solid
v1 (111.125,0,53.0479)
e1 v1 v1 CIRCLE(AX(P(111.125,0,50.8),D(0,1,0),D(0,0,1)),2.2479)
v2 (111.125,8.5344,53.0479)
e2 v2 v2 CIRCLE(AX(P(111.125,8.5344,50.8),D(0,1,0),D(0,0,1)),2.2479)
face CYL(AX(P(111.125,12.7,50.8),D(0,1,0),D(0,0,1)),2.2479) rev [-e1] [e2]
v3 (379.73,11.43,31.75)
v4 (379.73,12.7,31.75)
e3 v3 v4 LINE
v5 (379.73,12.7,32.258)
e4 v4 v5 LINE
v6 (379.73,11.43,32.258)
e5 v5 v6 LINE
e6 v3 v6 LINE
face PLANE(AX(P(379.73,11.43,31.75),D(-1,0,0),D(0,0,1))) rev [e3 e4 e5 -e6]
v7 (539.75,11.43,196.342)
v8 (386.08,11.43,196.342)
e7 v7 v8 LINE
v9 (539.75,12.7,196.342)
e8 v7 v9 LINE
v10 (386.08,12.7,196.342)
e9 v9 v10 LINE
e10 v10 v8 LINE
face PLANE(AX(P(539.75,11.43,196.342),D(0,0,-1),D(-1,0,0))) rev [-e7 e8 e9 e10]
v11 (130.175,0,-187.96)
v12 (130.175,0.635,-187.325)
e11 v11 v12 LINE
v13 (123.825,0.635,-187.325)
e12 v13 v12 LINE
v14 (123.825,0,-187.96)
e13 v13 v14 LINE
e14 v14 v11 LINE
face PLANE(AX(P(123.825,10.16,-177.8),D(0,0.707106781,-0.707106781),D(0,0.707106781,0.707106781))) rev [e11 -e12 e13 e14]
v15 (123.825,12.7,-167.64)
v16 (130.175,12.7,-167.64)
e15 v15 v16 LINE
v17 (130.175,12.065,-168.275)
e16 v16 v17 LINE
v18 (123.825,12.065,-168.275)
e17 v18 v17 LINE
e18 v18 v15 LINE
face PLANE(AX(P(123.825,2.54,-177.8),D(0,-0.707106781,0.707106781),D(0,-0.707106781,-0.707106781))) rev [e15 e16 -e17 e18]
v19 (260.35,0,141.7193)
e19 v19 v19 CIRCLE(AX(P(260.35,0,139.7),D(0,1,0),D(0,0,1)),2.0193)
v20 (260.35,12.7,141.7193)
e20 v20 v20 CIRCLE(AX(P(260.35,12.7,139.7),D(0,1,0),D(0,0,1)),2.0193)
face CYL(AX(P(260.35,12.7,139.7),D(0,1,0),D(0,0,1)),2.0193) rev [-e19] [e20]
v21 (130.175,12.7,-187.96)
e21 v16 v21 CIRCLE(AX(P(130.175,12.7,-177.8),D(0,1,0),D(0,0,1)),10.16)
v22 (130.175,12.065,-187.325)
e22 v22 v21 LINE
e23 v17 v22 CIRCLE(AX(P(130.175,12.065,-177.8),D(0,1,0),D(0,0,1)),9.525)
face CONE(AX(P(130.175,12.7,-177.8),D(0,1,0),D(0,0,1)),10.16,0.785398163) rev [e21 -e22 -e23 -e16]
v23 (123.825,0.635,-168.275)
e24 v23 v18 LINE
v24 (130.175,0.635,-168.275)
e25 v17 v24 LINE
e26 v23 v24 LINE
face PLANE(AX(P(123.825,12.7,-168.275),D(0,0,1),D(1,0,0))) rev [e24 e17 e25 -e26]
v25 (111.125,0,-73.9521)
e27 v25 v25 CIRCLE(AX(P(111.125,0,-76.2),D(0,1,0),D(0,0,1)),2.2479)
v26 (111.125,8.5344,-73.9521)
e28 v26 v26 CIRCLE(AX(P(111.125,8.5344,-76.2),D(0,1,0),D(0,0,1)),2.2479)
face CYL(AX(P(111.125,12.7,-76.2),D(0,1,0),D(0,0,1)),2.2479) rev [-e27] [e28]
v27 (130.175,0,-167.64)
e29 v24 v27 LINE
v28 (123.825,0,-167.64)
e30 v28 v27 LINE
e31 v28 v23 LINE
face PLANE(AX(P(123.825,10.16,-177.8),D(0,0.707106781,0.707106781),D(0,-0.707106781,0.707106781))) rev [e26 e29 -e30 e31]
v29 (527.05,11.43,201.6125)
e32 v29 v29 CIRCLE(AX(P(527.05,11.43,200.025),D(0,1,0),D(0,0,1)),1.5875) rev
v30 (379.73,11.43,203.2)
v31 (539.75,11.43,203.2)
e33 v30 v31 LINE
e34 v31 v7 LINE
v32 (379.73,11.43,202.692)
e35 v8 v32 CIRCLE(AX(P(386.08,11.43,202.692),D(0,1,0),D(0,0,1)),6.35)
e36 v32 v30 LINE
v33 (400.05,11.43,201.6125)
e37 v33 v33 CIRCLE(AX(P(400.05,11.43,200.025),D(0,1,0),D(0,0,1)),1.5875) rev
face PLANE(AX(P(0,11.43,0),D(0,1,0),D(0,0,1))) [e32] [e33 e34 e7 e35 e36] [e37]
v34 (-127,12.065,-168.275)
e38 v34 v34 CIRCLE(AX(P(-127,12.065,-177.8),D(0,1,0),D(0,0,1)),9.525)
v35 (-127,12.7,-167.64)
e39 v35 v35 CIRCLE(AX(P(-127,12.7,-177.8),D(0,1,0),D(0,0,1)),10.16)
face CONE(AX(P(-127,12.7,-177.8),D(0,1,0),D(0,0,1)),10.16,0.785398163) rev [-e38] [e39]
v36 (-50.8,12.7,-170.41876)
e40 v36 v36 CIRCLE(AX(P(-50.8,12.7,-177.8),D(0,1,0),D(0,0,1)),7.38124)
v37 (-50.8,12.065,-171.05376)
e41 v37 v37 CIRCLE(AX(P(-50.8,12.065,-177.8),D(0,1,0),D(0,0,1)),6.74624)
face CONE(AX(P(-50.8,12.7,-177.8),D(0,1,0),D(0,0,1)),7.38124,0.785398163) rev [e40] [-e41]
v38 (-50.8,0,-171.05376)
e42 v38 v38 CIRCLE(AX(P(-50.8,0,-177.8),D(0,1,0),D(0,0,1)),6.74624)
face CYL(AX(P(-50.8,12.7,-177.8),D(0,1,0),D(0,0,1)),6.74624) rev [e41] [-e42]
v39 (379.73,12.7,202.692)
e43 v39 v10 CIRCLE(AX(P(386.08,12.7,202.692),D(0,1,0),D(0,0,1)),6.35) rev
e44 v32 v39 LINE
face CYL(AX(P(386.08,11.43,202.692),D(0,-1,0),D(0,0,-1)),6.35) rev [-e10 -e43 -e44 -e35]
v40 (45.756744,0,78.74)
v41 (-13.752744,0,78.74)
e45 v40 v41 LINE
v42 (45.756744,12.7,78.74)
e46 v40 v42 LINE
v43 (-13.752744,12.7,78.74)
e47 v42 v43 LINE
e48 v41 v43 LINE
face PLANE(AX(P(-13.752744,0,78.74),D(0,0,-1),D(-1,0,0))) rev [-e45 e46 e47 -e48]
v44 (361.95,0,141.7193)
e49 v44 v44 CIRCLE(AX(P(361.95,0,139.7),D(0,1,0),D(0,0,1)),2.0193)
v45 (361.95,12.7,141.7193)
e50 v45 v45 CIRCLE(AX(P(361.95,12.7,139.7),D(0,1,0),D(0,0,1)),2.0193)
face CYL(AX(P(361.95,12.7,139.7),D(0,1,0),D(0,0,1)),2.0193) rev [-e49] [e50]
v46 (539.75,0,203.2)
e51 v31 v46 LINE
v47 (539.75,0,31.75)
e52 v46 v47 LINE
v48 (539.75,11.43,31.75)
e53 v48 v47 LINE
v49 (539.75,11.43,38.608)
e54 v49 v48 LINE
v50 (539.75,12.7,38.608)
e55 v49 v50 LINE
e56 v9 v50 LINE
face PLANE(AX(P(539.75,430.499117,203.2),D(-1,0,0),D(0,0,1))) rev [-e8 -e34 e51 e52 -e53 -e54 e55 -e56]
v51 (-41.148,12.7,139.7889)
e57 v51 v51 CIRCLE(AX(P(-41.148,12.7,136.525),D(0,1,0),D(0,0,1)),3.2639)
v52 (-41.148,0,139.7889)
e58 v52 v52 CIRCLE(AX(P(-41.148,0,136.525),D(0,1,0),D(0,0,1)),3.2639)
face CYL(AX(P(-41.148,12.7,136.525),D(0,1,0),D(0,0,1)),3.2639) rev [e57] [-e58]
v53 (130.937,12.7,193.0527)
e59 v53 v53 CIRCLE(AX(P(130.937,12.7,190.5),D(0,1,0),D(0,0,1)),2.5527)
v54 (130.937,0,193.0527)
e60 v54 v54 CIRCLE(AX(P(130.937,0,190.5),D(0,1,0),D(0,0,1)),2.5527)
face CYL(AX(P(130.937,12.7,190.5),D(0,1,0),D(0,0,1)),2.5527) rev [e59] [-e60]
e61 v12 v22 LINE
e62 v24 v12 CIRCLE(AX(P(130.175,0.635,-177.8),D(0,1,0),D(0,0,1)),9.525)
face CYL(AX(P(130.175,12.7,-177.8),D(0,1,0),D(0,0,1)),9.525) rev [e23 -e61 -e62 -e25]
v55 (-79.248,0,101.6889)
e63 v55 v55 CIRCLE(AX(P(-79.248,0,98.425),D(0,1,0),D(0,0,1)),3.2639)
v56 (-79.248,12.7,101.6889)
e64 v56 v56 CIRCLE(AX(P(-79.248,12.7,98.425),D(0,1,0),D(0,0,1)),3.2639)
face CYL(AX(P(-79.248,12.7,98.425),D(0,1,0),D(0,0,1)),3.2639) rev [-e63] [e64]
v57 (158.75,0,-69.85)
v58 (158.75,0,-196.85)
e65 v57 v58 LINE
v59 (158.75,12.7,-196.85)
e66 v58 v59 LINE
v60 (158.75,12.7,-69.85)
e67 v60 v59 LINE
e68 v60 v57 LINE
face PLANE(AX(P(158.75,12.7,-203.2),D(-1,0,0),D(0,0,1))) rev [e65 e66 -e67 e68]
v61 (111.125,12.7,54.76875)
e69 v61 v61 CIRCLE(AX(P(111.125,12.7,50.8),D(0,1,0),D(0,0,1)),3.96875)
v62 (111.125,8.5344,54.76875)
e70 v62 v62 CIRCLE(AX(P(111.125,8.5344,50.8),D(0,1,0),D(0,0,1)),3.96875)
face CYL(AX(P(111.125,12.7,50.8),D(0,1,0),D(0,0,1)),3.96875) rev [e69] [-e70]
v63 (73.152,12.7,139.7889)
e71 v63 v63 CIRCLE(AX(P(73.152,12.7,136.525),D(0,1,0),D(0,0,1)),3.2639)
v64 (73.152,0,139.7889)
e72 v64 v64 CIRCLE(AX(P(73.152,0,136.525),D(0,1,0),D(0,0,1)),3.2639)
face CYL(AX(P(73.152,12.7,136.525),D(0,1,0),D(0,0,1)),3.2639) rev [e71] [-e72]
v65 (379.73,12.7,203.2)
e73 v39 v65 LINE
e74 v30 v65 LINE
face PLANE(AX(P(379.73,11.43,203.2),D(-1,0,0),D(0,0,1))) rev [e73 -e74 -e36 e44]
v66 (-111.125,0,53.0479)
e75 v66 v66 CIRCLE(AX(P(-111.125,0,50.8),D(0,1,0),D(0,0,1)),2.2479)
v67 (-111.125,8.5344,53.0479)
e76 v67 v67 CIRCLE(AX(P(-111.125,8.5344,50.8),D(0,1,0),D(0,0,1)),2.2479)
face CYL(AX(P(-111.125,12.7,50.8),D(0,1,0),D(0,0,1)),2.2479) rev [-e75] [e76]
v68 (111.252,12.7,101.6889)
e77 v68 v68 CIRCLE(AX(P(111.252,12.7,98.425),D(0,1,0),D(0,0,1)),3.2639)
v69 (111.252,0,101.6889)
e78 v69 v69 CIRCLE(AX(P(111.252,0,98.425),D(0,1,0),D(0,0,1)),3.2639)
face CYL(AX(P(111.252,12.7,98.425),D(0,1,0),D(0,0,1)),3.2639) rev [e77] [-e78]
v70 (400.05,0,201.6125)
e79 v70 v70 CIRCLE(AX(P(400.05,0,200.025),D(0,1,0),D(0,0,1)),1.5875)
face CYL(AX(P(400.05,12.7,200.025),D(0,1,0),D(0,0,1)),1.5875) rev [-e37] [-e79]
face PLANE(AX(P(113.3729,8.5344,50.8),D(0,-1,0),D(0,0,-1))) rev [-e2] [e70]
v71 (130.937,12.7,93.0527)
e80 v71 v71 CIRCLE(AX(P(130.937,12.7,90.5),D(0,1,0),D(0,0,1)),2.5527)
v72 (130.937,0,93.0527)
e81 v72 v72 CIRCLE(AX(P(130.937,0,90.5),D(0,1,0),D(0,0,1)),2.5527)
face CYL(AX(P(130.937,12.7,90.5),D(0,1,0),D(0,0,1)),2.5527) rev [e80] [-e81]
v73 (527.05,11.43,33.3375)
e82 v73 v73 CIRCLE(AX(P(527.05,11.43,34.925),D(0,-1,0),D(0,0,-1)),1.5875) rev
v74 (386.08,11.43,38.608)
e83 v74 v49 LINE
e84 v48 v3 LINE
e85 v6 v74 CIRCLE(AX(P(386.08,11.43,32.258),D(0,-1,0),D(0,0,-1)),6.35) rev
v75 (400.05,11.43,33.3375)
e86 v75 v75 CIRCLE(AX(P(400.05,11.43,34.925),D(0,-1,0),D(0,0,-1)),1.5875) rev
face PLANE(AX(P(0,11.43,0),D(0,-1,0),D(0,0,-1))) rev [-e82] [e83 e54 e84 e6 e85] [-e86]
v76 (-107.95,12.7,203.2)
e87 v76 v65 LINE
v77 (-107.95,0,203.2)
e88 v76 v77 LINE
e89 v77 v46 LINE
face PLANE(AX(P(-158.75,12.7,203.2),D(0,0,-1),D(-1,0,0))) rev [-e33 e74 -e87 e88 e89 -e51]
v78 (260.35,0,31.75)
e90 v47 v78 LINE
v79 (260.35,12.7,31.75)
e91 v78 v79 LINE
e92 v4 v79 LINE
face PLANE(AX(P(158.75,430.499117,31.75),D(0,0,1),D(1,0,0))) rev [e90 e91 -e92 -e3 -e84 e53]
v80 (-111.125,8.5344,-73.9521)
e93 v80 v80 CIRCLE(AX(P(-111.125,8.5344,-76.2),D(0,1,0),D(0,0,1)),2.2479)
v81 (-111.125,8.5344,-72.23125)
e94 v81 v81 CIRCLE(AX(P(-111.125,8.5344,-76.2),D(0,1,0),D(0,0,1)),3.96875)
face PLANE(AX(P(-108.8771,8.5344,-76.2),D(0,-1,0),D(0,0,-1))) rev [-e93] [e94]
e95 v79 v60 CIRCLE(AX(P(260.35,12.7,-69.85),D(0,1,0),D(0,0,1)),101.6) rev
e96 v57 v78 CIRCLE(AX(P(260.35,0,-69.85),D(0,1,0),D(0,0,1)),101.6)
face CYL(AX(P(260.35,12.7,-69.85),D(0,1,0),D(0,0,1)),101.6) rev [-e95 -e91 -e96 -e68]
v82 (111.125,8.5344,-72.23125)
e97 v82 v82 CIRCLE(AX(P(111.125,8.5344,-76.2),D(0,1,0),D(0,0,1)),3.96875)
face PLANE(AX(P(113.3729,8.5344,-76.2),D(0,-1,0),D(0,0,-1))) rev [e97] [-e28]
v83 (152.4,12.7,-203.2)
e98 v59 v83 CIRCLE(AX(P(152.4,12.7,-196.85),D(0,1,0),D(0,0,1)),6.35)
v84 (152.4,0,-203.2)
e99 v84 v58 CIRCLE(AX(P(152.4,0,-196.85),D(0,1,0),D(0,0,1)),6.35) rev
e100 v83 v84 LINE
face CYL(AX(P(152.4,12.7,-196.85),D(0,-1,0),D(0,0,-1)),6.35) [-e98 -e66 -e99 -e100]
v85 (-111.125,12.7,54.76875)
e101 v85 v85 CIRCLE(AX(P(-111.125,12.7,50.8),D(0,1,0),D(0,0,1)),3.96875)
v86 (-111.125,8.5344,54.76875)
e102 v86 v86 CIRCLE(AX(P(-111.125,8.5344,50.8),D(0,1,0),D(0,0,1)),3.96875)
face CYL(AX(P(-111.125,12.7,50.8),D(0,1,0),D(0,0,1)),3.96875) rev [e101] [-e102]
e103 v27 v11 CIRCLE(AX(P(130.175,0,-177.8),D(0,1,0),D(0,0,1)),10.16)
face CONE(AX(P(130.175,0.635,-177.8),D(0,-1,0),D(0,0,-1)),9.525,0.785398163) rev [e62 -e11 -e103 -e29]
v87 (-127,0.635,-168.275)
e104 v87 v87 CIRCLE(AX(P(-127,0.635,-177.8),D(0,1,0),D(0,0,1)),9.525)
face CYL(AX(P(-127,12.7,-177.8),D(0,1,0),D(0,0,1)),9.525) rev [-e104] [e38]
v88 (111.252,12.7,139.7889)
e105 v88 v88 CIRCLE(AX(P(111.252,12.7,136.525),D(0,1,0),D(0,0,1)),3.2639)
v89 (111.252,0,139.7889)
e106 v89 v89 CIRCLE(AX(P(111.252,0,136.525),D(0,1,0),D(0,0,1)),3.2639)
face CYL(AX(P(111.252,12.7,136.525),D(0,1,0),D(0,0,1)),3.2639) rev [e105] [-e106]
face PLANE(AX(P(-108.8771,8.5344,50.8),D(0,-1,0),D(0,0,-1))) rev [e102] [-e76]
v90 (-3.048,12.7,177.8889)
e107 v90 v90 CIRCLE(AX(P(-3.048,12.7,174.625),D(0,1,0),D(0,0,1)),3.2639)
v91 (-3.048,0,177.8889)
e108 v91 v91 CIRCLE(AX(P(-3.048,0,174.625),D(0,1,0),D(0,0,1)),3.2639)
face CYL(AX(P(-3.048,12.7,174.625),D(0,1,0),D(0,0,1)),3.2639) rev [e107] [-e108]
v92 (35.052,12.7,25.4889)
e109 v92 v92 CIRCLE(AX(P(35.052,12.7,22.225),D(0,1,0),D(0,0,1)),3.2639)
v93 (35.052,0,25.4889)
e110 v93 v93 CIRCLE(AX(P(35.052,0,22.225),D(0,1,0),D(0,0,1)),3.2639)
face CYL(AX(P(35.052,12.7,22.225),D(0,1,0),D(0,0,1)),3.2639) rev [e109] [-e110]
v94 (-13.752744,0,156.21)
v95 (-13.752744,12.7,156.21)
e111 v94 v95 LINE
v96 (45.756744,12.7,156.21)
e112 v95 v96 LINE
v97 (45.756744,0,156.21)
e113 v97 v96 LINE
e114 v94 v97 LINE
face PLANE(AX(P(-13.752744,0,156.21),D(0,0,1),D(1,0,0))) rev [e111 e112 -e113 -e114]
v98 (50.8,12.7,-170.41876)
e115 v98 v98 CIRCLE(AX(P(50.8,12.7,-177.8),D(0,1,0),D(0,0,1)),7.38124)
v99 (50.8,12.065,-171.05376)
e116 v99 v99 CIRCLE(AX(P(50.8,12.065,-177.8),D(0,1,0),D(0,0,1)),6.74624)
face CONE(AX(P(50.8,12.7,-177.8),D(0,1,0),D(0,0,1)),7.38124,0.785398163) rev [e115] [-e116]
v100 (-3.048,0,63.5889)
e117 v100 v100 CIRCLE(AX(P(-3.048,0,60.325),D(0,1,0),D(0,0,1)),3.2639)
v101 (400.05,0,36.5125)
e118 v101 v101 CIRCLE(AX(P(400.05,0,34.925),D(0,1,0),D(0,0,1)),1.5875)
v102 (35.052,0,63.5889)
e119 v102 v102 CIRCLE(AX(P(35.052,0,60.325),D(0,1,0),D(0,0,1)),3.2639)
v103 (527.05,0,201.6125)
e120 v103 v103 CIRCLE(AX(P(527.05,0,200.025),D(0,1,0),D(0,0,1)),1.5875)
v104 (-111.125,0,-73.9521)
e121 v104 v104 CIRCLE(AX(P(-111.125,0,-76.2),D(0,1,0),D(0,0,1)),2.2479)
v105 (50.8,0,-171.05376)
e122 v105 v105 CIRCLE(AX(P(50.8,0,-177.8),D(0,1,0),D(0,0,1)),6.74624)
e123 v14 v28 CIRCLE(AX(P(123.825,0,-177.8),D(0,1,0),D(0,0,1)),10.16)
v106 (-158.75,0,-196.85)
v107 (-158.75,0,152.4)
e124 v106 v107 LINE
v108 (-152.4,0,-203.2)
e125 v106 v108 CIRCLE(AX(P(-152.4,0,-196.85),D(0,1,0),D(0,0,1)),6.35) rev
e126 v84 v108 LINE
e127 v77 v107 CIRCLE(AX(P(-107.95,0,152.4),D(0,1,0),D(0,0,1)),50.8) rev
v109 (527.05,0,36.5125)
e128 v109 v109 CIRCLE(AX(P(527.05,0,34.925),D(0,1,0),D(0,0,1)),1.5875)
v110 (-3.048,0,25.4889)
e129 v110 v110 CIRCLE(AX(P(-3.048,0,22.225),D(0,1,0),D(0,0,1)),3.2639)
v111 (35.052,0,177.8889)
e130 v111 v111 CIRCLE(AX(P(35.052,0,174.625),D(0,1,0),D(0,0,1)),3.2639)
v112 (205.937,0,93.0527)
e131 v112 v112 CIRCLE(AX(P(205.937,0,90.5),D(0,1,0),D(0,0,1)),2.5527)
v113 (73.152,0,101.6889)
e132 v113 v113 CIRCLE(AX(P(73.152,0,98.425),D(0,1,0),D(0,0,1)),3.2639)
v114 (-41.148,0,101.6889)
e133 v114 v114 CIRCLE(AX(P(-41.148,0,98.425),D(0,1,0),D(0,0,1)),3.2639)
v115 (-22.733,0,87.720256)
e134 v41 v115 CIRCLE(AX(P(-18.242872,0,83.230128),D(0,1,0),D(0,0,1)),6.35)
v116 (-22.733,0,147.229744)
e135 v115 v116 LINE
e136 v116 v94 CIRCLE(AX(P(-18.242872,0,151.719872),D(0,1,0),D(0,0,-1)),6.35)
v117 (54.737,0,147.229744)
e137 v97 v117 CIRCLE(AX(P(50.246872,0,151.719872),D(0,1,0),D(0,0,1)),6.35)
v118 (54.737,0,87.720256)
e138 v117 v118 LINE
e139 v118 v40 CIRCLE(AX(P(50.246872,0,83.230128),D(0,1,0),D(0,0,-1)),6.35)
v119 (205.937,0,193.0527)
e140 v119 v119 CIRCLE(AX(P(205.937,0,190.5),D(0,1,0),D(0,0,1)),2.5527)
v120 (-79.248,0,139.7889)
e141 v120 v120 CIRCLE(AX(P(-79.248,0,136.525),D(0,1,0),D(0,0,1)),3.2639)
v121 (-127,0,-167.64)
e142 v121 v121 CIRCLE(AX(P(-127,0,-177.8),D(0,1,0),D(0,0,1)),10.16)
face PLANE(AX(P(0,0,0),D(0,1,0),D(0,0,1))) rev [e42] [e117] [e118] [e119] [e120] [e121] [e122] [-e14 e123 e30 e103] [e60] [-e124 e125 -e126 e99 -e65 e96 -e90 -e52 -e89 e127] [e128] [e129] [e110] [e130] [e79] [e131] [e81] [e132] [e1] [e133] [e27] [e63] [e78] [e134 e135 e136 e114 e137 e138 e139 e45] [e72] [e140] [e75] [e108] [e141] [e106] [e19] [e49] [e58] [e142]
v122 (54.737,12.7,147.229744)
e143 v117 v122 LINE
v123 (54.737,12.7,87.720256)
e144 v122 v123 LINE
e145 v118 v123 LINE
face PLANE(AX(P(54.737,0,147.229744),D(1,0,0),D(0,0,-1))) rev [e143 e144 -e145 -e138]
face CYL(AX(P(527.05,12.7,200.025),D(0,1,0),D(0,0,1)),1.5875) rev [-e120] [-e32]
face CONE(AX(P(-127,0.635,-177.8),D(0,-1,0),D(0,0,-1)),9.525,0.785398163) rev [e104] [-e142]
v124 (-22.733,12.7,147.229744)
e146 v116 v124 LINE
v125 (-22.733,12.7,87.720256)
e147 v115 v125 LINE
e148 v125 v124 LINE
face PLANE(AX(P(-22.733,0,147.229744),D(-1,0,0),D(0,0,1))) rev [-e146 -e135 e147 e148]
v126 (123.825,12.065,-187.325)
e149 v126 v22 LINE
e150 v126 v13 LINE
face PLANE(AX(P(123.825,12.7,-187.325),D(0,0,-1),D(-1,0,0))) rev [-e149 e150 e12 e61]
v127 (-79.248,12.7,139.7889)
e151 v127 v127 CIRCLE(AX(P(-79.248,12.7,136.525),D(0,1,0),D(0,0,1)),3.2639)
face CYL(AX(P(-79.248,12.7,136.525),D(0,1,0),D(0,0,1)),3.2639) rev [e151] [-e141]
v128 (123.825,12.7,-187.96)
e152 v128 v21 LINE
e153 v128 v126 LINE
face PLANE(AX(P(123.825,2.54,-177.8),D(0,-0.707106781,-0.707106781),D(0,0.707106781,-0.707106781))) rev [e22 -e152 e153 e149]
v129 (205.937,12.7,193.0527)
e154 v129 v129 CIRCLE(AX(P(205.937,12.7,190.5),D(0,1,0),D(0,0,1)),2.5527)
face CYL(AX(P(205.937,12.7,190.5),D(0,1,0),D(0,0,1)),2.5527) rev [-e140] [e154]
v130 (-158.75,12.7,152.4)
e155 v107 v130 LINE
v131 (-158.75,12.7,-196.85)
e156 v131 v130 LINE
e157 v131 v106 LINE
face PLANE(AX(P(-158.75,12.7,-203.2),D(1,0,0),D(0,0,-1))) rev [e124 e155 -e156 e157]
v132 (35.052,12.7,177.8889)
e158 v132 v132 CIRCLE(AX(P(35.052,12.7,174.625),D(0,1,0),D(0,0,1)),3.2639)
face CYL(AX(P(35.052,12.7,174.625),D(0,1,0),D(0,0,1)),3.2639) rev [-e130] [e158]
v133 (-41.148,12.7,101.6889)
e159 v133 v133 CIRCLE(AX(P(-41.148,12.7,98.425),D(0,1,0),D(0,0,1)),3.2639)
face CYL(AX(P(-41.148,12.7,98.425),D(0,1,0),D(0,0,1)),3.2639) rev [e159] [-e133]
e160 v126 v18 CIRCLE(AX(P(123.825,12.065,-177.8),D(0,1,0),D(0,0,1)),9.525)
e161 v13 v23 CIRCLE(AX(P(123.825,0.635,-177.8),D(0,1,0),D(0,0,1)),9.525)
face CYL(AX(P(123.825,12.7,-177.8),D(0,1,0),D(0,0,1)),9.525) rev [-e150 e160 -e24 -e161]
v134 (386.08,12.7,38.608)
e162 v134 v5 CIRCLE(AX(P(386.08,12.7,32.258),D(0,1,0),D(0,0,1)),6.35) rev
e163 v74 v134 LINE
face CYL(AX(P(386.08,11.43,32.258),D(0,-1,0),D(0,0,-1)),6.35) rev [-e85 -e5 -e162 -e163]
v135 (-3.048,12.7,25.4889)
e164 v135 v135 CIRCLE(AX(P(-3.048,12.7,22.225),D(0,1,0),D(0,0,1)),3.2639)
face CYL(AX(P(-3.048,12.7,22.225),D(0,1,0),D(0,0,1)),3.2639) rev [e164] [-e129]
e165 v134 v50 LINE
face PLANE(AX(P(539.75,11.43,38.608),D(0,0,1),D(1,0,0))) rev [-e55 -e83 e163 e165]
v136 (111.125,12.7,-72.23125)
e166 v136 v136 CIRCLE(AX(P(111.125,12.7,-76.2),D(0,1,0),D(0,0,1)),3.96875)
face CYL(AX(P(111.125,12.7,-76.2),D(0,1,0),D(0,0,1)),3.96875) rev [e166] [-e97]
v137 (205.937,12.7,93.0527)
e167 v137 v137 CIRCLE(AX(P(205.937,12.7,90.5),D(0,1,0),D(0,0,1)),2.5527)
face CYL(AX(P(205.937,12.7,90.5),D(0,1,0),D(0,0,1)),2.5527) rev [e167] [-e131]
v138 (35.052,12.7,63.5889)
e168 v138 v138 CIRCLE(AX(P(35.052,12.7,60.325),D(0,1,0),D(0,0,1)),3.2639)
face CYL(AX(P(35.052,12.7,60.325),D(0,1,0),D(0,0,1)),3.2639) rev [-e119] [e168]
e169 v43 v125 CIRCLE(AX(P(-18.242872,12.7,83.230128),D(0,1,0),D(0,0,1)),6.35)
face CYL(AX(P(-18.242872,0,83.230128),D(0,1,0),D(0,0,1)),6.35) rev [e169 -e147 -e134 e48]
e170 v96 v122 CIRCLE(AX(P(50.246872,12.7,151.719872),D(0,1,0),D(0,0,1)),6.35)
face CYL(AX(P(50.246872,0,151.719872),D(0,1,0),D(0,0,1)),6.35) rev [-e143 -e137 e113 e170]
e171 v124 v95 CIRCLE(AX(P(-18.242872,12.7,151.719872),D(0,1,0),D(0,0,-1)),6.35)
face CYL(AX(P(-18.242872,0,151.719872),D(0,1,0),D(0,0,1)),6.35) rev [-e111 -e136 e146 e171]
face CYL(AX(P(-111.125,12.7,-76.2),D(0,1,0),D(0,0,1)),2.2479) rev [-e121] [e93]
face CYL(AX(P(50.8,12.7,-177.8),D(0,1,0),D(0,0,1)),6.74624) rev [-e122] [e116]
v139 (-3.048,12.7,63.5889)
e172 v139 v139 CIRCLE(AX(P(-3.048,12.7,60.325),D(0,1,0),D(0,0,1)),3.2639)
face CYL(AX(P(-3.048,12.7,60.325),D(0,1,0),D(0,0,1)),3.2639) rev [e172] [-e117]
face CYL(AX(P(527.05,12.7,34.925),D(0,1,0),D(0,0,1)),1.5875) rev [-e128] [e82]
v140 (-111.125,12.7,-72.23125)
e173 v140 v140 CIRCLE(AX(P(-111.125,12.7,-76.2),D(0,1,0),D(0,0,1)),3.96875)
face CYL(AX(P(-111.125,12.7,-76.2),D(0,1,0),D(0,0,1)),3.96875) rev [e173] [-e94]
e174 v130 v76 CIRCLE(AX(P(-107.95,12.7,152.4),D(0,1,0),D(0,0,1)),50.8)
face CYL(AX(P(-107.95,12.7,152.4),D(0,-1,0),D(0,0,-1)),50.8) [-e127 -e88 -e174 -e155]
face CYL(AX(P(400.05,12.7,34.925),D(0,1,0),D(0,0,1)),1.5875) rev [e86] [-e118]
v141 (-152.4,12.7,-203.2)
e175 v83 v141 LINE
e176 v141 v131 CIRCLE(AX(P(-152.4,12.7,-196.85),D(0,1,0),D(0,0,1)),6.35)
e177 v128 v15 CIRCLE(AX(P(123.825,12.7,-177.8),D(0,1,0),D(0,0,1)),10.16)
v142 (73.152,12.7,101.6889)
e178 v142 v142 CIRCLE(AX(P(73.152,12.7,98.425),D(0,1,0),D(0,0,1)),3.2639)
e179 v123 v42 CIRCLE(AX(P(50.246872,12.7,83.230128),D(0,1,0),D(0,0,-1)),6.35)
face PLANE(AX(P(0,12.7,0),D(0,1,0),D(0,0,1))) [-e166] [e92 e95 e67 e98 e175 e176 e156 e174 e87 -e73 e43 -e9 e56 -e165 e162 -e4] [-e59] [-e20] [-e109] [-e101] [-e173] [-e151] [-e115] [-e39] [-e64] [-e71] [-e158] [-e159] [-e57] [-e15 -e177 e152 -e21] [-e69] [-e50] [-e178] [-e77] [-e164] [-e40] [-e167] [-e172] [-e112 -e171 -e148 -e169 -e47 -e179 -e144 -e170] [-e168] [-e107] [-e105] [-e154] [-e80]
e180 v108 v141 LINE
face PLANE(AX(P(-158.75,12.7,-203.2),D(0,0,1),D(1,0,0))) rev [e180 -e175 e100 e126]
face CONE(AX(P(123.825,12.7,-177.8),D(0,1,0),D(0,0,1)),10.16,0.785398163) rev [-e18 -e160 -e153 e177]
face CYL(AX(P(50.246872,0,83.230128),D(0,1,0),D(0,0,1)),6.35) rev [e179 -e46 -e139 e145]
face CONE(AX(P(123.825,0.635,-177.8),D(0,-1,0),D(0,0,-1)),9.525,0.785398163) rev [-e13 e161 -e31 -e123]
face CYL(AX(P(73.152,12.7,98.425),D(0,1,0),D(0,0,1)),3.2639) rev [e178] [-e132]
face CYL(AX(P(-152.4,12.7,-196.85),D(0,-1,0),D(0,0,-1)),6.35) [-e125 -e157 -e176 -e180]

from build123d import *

# Parameters (mm, degrees)
SKETCH1_W                                      = 317.5
SKETCH1_H                                      = 406.4
BOSS_EXTRUDE1_DEPTH                            = 12.7
FILLET1_R                                      = 6.35
F_3_4_START                                    = 123.825
F_3_4_0_7500_DOWEL_SLOT1_3_DEPTH               = 6.35
F_1_2_CLEARANCE_HOLE1_D                        = 13.49248
F_1_2_CLEARANCE_HOLE1_CSINK_D                  = 14.76248
F_1_2_CLEARANCE_HOLE1_CSINK_ANGLE              = 90
SKETCH8_W                                      = 381
SKETCH8_H                                      = 171.45
BOSS_EXTRUDE2_DEPTH                            = 12.7
FILLET2_R                                      = 50.8
FILLET3_R                                      = 101.6
F_1_8_0_1250_DOWEL_HOLE1_D                     = 3.175
F_1_8_0_1250_DOWEL_HOLE1_CSINK_D               = 4.445
F_1_8_0_1250_DOWEL_HOLE1_CSINK_ANGLE           = 90
CUT_EXTRUDE1_DEPTH                             = 577.872249723
F_5_16_18_TAPPED_HOLE1_D                       = 6.5278
F_5_16_18_TAPPED_HOLE1_DEPTH                   = 20.1168
F_5_16_18_TAPPED_HOLE1_TIP                     = 1.961148974
CBORE_FOR_8_SOCKET_HEAD_CAP_SCREW1_D           = 4.4958
CBORE_FOR_8_SOCKET_HEAD_CAP_SCREW1_CBORE_D     = 7.9375
CBORE_FOR_8_SOCKET_HEAD_CAP_SCREW1_CBORE_DEPTH = 4.1656
SKETCH23_W                                     = 160.02
SKETCH23_H                                     = 6.858
CUT_EXTRUDE3_DEPTH                             = 1.27
FILLET4_R                                      = 6.35
F_10_32_TAPPED_HOLE1_D                         = 4.0386
F_1_4_20_TAPPED_HOLE1_D                        = 5.1054


with BuildPart() as part:
    # Sketch1 → Boss-Extrude1 (new body)
    with BuildSketch(Plane(origin=(0, 0, 0), x_dir=(1, 0, 0), z_dir=(0, 1, 0))):
        Rectangle(SKETCH1_W, SKETCH1_H)
    extrude(amount=BOSS_EXTRUDE1_DEPTH)

    # Fillet1
    fillet1_edges = [part.edges().sort_by_distance(p)[0] for p in [
        (-158.75, 6.35, -203.2),
        (158.75, 6.35, -203.2),
    ]]
    fillet(fillet1_edges, radius=FILLET1_R)

    # Sketch3 → 3/4 (0.7500) Dowel Hole1 (revolve, cut)
    with BuildSketch(Plane(origin=(-127, 12.7, -177.8), x_dir=(0, 0, 1), z_dir=(1, 0, 0))):
        Polygon((0, 0), (0, 12.7), (10.16, 12.7), (9.525, 12.065), (9.525, 0.635), (10.16, 0), align=None)
    revolve(axis=Axis((-127, 19.05, -177.8), (0, -1, 0)), mode=Mode.SUBTRACT)

    # 3/4 (0.7500) Dowel Slot1: read off the stored shape, not the designer's step
    # 3/4 (0.7500) Dowel Slot1 outline → 3/4 (0.7500) Dowel Slot1 (revolve, cut)
    with BuildSketch(Plane(origin=(130.175, 0, -177.8), x_dir=(1, 0, 0), z_dir=(0, 0, 1))):
        Polygon((0, 0), (10.16, 0), (9.525, 0.635), (9.525, 12.065), (10.16, 12.7), (0, 12.7), align=None)
    revolve(axis=Axis((130.175, 0, -177.8), (0, 1, 0)), mode=Mode.SUBTRACT)

    # 3_4 _0.7500_ Dowel Slot1 2 outline → 3_4 _0.7500_ Dowel Slot1 2 (revolve, cut)
    with BuildSketch(Plane(origin=(123.825, 0, -177.8), x_dir=(1, 0, 0), z_dir=(0, 0, 1))):
        Polygon((0, 0), (10.16, 0), (9.525, 0.635), (9.525, 12.065), (10.16, 12.7), (0, 12.7), align=None)
    revolve(axis=Axis((123.825, 0, -177.8), (0, 1, 0)), mode=Mode.SUBTRACT)

    # 3_4 _0.7500_ Dowel Slot1 3 outline → 3_4 _0.7500_ Dowel Slot1 3 (cut)
    with BuildSketch(Plane.YZ.offset(F_3_4_START)):
        Polygon((0.635, -187.325), (12.065, -187.325), (12.7, -187.96), (12.7, -167.64), (12.065, -168.275), (0.635, -168.275), (0, -167.64), (0, -187.96), align=None)
    extrude(amount=F_3_4_0_7500_DOWEL_SLOT1_3_DEPTH, mode=Mode.SUBTRACT)

    # 1/2 Clearance Hole1 (through all)
    with Locations(Plane(origin=(0, 12.7, 0), x_dir=(1, 0, 0), z_dir=(0, 1, 0))):
        with Locations((-50.8, 177.8), (50.8, 177.8)):
            CounterSinkHole(F_1_2_CLEARANCE_HOLE1_D / 2, F_1_2_CLEARANCE_HOLE1_CSINK_D / 2, counter_sink_angle=F_1_2_CLEARANCE_HOLE1_CSINK_ANGLE)

    # Sketch8 → Boss-Extrude2 (add)
    with BuildSketch(Plane(origin=(0, 0, 0), x_dir=(1, 0, 0), z_dir=(0, 1, 0))):
        with Locations((349.25, -117.475)):
            Rectangle(SKETCH8_W, SKETCH8_H)
    extrude(amount=BOSS_EXTRUDE2_DEPTH)

    # Fillet2
    fillet2_edges = [part.edges().sort_by_distance(p)[0] for p in [
        (-158.75, 6.35, 203.2),
    ]]
    fillet(fillet2_edges, radius=FILLET2_R)

    # Fillet3
    fillet3_edges = [part.edges().sort_by_distance(p)[0] for p in [
        (158.75, 6.35, 31.75),
    ]]
    fillet(fillet3_edges, radius=FILLET3_R)

    # 1/8 (0.1250) Dowel Hole1 (through all)
    with Locations(Plane(origin=(0, 12.7, 0), x_dir=(1, 0, 0), z_dir=(0, 1, 0))):
        with Locations((400.05, -34.925), (527.05, -34.925), (400.05, -200.025), (527.05, -200.025)):
            CounterSinkHole(F_1_8_0_1250_DOWEL_HOLE1_D / 2, F_1_8_0_1250_DOWEL_HOLE1_CSINK_D / 2, counter_sink_angle=F_1_8_0_1250_DOWEL_HOLE1_CSINK_ANGLE)

    # Sketch13 → Cut-Extrude1 (cut, through all)
    with BuildSketch(Plane(origin=(0, 12.7, 0), x_dir=(1, 0, 0), z_dir=(0, 1, 0))):
        with BuildLine():
            Line((-13.752743879, -156.21), (45.756743879, -156.21))
            ThreePointArc((45.756743879, -156.21), (54.737, -156.21), (54.737, -147.229743879))
            Line((54.737, -147.229743879), (54.737, -87.720256121))
            ThreePointArc((54.737, -87.720256121), (54.737, -78.74), (45.756743879, -78.74))
            Line((45.756743879, -78.74), (-13.752743879, -78.74))
            ThreePointArc((-13.752743879, -78.74), (-22.733, -78.74), (-22.733, -87.720256121))
            Line((-22.733, -87.720256121), (-22.733, -147.229743879))
            ThreePointArc((-22.733, -147.229743879), (-22.733, -156.21), (-13.752743879, -156.21))
        make_face()
    extrude(amount=-CUT_EXTRUDE1_DEPTH, mode=Mode.SUBTRACT)

    # 5/16-18 Tapped Hole1
    with Locations(Plane(origin=(0, 12.7, 0), x_dir=(1, 0, 0), z_dir=(0, 1, 0))):
        with Locations((-41.148, -98.425), (-41.148, -136.525), (73.152, -98.425), (73.152, -136.525), (-79.248, -98.425), (-79.248, -136.525), (111.252, -98.425), (111.252, -136.525), (-3.048, -60.325), (35.052, -60.325), (-3.048, -22.225), (35.052, -22.225), (-3.048, -174.625), (35.052, -174.625)):
            Hole(F_5_16_18_TAPPED_HOLE1_D / 2, depth=F_5_16_18_TAPPED_HOLE1_DEPTH)
            with Locations((0, 0, -(F_5_16_18_TAPPED_HOLE1_DEPTH + F_5_16_18_TAPPED_HOLE1_TIP / 2))):  # 118° drill point
                Cone(0, F_5_16_18_TAPPED_HOLE1_D / 2, F_5_16_18_TAPPED_HOLE1_TIP, mode=Mode.SUBTRACT)

    # CBORE for #8 Socket Head Cap Screw1 (through all)
    with Locations(Plane(origin=(0, 12.7, 0), x_dir=(1, 0, 0), z_dir=(0, 1, 0))):
        with Locations((-111.125, 76.2), (-111.125, -50.8), (111.125, 76.2), (111.125, -50.8)):
            CounterBoreHole(CBORE_FOR_8_SOCKET_HEAD_CAP_SCREW1_D / 2, CBORE_FOR_8_SOCKET_HEAD_CAP_SCREW1_CBORE_D / 2, CBORE_FOR_8_SOCKET_HEAD_CAP_SCREW1_CBORE_DEPTH)

    # Sketch23 → Cut-Extrude3 (cut)
    with BuildSketch(Plane(origin=(0, 12.7, 0), x_dir=(1, 0, 0), z_dir=(0, 1, 0))):
        with Locations((459.74, -35.179)):
            Rectangle(SKETCH23_W, SKETCH23_H)
        with Locations((459.74, -199.771)):
            Rectangle(SKETCH23_W, SKETCH23_H)
    extrude(amount=-CUT_EXTRUDE3_DEPTH, mode=Mode.SUBTRACT)

    # Fillet4
    fillet4_edges = [part.edges().sort_by_distance(p)[0] for p in [
        (379.73, 12.065, 38.608),
        (379.73, 12.065, 196.342),
    ]]
    fillet(fillet4_edges, radius=FILLET4_R)

    # #10-32 Tapped Hole1 (through all)
    with Locations(Plane(origin=(0, 12.7, 0), x_dir=(1, 0, 0), z_dir=(0, 1, 0))):
        with Locations((260.35, -139.7), (361.95, -139.7)):
            Hole(F_10_32_TAPPED_HOLE1_D / 2)

    # 1/4-20 Tapped Hole1 (through all)
    with Locations(Plane(origin=(0, 12.7, 0), x_dir=(1, 0, 0), z_dir=(0, 1, 0))):
        with Locations((130.937, -90.5), (205.937, -90.5), (205.937, -190.5), (130.937, -190.5)):
            Hole(F_1_4_20_TAPPED_HOLE1_D / 2)


solid = part.part
